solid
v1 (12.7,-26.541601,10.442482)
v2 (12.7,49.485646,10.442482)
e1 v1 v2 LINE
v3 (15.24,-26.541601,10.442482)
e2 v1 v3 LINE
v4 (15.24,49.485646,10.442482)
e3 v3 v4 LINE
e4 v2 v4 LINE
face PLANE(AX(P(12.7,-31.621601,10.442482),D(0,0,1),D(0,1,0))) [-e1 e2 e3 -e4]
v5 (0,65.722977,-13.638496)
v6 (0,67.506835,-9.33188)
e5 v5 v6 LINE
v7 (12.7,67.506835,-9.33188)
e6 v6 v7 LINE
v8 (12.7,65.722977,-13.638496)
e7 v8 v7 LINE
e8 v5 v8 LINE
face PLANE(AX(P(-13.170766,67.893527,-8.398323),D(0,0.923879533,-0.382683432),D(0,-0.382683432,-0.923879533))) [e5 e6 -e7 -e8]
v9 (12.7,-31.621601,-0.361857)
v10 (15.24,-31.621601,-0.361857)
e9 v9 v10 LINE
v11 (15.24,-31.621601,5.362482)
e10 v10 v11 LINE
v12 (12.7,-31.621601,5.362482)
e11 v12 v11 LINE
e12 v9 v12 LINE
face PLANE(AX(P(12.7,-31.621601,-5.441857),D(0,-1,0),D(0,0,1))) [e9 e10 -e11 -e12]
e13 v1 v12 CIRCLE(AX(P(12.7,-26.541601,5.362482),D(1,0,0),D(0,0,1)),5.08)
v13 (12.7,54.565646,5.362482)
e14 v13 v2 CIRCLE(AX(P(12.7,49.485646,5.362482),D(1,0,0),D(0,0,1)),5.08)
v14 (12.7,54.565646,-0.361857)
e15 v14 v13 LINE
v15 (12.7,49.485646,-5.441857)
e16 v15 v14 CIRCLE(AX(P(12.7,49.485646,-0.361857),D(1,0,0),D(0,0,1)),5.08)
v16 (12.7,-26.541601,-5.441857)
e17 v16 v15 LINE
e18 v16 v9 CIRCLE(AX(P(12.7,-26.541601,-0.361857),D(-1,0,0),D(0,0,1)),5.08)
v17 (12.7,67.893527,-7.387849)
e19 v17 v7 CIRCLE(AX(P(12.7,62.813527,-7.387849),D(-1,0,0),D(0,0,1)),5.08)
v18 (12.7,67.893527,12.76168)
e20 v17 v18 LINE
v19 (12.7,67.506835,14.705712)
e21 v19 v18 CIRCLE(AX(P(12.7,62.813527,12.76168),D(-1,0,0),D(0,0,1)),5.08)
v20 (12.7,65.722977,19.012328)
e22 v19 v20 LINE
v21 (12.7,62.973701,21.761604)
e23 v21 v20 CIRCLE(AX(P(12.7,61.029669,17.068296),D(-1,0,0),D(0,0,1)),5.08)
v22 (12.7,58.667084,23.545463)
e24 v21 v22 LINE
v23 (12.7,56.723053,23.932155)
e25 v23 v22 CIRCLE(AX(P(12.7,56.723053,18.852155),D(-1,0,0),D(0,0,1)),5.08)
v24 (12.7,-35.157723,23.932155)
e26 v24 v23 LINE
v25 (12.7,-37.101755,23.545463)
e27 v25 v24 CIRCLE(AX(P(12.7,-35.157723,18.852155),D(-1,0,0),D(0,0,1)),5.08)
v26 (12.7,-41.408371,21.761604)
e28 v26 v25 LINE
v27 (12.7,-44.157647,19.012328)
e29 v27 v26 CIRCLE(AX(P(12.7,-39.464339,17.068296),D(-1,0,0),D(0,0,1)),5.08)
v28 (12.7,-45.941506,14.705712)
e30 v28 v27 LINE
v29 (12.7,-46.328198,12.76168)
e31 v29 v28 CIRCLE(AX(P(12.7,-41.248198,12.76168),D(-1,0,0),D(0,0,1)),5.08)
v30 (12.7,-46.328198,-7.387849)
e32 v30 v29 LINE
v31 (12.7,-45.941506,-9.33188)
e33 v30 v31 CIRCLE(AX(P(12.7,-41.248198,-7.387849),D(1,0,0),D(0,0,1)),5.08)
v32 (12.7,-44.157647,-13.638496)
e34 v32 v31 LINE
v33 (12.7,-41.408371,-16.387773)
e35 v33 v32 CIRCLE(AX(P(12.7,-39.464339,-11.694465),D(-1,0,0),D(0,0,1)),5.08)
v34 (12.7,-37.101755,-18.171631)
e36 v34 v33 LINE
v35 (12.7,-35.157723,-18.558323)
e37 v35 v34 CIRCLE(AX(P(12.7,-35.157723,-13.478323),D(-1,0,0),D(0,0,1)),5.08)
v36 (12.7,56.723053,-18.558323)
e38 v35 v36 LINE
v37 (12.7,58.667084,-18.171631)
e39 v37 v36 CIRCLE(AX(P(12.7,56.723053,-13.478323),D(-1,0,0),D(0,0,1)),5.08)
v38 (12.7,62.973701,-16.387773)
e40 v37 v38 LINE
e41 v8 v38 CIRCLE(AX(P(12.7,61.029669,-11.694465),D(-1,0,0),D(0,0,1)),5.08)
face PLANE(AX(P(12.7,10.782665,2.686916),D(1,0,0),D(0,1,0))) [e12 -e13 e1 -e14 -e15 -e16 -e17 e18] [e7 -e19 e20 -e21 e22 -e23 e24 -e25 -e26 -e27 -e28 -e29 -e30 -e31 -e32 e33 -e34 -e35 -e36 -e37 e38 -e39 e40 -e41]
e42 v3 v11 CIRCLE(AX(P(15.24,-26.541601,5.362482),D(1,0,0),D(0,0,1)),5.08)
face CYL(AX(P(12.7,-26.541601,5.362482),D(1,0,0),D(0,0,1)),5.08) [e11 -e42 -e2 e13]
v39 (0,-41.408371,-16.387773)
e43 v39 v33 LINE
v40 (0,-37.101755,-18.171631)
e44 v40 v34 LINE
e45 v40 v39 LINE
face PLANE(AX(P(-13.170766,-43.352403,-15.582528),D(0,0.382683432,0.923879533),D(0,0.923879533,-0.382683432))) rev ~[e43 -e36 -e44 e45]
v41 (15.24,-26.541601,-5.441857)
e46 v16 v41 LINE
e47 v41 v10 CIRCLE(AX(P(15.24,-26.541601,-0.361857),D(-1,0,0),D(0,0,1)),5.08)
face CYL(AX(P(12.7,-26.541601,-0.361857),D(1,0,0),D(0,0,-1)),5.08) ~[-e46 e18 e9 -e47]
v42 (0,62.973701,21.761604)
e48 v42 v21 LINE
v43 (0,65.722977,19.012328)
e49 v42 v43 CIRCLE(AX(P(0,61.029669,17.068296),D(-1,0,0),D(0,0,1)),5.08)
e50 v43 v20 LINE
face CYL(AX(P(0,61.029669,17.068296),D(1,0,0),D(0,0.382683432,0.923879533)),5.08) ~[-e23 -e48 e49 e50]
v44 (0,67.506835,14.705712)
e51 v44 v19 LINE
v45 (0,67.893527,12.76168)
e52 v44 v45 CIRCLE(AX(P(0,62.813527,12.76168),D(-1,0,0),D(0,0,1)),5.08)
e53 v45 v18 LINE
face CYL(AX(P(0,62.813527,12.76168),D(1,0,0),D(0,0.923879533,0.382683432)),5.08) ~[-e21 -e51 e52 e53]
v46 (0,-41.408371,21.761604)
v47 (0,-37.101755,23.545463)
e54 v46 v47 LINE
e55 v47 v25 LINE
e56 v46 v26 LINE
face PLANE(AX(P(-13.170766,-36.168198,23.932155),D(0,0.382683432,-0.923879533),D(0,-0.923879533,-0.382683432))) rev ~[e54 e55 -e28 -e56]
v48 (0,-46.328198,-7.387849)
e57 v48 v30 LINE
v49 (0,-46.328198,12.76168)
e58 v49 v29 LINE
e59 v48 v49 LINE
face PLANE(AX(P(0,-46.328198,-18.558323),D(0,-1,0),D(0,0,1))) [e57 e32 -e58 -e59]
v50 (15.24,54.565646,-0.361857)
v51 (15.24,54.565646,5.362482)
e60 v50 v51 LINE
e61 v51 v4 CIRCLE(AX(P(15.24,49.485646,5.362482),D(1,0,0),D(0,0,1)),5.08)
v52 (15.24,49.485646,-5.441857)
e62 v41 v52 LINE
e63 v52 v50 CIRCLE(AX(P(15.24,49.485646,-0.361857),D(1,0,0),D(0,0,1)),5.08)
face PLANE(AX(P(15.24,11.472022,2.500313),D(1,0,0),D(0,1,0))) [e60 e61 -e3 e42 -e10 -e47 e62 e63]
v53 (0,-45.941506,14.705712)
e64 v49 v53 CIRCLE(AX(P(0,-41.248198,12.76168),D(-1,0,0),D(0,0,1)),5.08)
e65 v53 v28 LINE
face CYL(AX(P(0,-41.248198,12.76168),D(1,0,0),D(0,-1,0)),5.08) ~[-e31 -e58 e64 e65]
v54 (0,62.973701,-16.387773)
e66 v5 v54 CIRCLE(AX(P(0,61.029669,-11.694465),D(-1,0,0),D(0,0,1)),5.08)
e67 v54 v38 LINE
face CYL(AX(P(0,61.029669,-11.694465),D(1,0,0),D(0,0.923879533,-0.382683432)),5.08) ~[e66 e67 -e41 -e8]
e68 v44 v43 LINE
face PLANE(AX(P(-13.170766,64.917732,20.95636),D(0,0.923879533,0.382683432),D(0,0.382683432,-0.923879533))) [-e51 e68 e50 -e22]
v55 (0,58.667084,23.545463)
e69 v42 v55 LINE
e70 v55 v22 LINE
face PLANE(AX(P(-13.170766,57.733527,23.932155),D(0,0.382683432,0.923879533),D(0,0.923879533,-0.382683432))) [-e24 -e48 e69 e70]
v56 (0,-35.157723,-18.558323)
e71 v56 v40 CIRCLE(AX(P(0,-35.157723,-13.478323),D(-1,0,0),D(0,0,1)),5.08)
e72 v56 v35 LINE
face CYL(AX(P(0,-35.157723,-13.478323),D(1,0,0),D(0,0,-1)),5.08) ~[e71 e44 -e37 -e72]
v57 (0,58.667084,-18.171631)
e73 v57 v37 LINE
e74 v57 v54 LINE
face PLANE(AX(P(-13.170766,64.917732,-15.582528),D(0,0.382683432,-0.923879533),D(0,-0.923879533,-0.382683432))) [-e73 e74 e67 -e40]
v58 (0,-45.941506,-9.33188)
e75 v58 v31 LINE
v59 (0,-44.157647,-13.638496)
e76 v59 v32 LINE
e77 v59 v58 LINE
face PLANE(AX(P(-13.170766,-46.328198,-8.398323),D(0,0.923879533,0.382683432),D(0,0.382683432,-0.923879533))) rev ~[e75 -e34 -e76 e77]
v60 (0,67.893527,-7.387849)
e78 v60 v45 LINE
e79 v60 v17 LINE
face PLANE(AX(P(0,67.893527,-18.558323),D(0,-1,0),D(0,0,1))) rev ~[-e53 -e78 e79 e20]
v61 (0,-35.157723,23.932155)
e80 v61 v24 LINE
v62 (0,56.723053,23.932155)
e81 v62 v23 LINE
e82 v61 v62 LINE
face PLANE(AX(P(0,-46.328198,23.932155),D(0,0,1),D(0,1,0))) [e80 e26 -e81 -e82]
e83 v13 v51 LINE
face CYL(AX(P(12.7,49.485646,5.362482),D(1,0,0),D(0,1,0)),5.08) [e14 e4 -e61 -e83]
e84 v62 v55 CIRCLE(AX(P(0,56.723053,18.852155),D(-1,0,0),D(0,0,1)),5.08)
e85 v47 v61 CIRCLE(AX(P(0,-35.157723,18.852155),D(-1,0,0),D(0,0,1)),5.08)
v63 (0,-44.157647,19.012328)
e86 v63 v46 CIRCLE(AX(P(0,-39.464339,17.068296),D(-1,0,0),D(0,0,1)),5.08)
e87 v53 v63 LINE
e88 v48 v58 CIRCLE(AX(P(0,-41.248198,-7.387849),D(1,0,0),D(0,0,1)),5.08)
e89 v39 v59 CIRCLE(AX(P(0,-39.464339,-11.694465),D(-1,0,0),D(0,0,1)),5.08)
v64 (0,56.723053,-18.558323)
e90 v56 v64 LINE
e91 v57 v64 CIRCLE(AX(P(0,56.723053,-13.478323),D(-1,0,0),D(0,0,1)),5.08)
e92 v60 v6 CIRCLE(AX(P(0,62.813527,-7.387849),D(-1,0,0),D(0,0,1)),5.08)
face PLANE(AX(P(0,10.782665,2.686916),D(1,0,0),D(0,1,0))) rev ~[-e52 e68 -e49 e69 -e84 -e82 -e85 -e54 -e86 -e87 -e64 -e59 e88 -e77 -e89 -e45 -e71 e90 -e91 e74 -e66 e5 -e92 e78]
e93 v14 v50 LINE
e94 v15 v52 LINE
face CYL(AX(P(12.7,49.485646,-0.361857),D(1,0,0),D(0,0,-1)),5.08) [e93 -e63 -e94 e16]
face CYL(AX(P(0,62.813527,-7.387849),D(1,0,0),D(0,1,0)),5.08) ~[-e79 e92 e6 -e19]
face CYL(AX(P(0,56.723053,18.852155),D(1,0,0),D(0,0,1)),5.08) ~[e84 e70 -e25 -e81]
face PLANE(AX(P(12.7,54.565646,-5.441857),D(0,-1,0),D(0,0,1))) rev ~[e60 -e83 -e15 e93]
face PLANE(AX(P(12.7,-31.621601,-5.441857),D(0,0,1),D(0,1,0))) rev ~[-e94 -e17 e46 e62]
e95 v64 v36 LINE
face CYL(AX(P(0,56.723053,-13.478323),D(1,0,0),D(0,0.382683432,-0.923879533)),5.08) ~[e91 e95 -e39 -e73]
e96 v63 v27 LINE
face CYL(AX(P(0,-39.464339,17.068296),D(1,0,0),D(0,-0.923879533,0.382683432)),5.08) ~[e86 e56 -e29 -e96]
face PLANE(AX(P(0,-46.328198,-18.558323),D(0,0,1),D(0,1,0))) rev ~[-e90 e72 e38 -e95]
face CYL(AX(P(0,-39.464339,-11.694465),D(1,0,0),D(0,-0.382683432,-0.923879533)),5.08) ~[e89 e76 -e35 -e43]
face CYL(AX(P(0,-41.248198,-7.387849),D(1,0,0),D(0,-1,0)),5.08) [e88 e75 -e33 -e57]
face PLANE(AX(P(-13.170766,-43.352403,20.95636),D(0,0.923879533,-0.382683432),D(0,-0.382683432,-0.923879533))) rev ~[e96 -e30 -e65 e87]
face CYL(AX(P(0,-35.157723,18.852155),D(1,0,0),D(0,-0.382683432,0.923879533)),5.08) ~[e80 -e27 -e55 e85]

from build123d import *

# Parameters (mm, degrees)
F0_W        = 114.2217256129
F0_H        = 42.490478605
F1_DEPTH    = 12.7
F2_W        = 86.1872471869
F2_H        = 15.8843388781
F3_DEPTH    = 2.54
F4_R        = 5.08
F5_SIZE     = 5.08
F6_T1_DEPTH = 39.0415311919
F7_R        = 5.08


# Not quite as in the source:
# - a fillet or chamfer that OpenCascade refuses, or shapes differently, is made with other operations: its cross-section is extruded or revolved along the edge and cut away or added


with BuildPart() as f1:
    # F0 (on Right) → F1 (new body)
    with BuildSketch(Plane.YZ):
        with Locations((10.7826646417, 2.6869159192)):
            Rectangle(F0_W, F0_H)
    extrude(amount=F1_DEPTH)

    # F2 (on face) → F3 (join)
    with BuildSketch(Plane.YZ.offset(12.7)):
        with Locations((11.4720221609, 2.5003128685)):
            Rectangle(F2_W, F2_H)
    extrude(amount=F3_DEPTH)

    # F4
    f4_edges = [f1.edges().sort_by_distance(p)[0] for p in [
        (13.97, -31.621601, 10.442482),
        (13.97, -31.621601, -5.441857),
        (13.97, 54.565646, 10.442482),
        (13.97, 54.565646, -5.441857),
    ]]
    fillet(f4_edges, radius=F4_R)

    # F5
    f5_edges = [f1.edges().sort_by_distance(p)[0] for p in [
        (6.35, 67.893527, 23.932155),
        (6.35, 67.893527, -18.558323),
        (6.35, -46.328198, -18.558323),
        (6.35, -46.328198, 23.932155),
    ]]
    chamfer(f5_edges, length=F5_SIZE)

    # F6: chamfer of 5.08 on 8 edges, made by hand

    # F6_s2 → F6_t1 (cut)
    with BuildSketch(Plane.YZ.offset(-13.170765596)):
        Polygon((-42.7360957163, 22.4442576701), (-46.3281981647, 13.7721552217), (-46.3281981647, 18.8521552217), align=None)
        Polygon((-36.1681981647, 23.9321552217), (-44.8403006131, 20.3400527733), (-41.2481981647, 23.9321552217), align=None)
        Polygon((57.7335274482, 23.9321552217), (66.4056298966, 20.3400527733), (62.8135274482, 23.9321552217), align=None)
        Polygon((64.3014249997, 22.4442576701), (67.8935274482, 13.7721552217), (67.8935274482, 18.8521552217), align=None)
        Polygon((67.8935274482, -8.3983233833), (64.3014249997, -17.0704258318), (67.8935274482, -13.4783233833), align=None)
        Polygon((66.4056298966, -14.9662209349), (57.7335274482, -18.5583233833), (62.8135274482, -18.5583233833), align=None)
        Polygon((-46.3281981647, -8.3983233833), (-42.7360957163, -17.0704258318), (-46.3281981647, -13.4783233833), align=None)
        Polygon((-44.8403006131, -14.9662209349), (-36.1681981647, -18.5583233833), (-41.2481981647, -18.5583233833), align=None)
    extrude(amount=F6_T1_DEPTH, mode=Mode.SUBTRACT)

    # F7
    f7_edges = [f1.edges().sort_by_distance(p)[0] for p in [
        (6.35, -43.352403, -15.582528),
        (6.35, -36.168198, -18.558323),
        (6.35, -46.328198, -8.398323),
        (6.35, -43.352403, 20.95636),
        (6.35, -46.328198, 13.772155),
        (6.35, -36.168198, 23.932155),
        (6.35, 57.733527, 23.932155),
        (6.35, 64.917732, 20.95636),
        (6.35, 67.893527, 13.772155),
        (6.35, 67.893527, -8.398323),
        (6.35, 64.917732, -15.582528),
        (6.35, 57.733527, -18.558323),
    ]]
    fillet(f7_edges, radius=F7_R)


solid = f1.part
